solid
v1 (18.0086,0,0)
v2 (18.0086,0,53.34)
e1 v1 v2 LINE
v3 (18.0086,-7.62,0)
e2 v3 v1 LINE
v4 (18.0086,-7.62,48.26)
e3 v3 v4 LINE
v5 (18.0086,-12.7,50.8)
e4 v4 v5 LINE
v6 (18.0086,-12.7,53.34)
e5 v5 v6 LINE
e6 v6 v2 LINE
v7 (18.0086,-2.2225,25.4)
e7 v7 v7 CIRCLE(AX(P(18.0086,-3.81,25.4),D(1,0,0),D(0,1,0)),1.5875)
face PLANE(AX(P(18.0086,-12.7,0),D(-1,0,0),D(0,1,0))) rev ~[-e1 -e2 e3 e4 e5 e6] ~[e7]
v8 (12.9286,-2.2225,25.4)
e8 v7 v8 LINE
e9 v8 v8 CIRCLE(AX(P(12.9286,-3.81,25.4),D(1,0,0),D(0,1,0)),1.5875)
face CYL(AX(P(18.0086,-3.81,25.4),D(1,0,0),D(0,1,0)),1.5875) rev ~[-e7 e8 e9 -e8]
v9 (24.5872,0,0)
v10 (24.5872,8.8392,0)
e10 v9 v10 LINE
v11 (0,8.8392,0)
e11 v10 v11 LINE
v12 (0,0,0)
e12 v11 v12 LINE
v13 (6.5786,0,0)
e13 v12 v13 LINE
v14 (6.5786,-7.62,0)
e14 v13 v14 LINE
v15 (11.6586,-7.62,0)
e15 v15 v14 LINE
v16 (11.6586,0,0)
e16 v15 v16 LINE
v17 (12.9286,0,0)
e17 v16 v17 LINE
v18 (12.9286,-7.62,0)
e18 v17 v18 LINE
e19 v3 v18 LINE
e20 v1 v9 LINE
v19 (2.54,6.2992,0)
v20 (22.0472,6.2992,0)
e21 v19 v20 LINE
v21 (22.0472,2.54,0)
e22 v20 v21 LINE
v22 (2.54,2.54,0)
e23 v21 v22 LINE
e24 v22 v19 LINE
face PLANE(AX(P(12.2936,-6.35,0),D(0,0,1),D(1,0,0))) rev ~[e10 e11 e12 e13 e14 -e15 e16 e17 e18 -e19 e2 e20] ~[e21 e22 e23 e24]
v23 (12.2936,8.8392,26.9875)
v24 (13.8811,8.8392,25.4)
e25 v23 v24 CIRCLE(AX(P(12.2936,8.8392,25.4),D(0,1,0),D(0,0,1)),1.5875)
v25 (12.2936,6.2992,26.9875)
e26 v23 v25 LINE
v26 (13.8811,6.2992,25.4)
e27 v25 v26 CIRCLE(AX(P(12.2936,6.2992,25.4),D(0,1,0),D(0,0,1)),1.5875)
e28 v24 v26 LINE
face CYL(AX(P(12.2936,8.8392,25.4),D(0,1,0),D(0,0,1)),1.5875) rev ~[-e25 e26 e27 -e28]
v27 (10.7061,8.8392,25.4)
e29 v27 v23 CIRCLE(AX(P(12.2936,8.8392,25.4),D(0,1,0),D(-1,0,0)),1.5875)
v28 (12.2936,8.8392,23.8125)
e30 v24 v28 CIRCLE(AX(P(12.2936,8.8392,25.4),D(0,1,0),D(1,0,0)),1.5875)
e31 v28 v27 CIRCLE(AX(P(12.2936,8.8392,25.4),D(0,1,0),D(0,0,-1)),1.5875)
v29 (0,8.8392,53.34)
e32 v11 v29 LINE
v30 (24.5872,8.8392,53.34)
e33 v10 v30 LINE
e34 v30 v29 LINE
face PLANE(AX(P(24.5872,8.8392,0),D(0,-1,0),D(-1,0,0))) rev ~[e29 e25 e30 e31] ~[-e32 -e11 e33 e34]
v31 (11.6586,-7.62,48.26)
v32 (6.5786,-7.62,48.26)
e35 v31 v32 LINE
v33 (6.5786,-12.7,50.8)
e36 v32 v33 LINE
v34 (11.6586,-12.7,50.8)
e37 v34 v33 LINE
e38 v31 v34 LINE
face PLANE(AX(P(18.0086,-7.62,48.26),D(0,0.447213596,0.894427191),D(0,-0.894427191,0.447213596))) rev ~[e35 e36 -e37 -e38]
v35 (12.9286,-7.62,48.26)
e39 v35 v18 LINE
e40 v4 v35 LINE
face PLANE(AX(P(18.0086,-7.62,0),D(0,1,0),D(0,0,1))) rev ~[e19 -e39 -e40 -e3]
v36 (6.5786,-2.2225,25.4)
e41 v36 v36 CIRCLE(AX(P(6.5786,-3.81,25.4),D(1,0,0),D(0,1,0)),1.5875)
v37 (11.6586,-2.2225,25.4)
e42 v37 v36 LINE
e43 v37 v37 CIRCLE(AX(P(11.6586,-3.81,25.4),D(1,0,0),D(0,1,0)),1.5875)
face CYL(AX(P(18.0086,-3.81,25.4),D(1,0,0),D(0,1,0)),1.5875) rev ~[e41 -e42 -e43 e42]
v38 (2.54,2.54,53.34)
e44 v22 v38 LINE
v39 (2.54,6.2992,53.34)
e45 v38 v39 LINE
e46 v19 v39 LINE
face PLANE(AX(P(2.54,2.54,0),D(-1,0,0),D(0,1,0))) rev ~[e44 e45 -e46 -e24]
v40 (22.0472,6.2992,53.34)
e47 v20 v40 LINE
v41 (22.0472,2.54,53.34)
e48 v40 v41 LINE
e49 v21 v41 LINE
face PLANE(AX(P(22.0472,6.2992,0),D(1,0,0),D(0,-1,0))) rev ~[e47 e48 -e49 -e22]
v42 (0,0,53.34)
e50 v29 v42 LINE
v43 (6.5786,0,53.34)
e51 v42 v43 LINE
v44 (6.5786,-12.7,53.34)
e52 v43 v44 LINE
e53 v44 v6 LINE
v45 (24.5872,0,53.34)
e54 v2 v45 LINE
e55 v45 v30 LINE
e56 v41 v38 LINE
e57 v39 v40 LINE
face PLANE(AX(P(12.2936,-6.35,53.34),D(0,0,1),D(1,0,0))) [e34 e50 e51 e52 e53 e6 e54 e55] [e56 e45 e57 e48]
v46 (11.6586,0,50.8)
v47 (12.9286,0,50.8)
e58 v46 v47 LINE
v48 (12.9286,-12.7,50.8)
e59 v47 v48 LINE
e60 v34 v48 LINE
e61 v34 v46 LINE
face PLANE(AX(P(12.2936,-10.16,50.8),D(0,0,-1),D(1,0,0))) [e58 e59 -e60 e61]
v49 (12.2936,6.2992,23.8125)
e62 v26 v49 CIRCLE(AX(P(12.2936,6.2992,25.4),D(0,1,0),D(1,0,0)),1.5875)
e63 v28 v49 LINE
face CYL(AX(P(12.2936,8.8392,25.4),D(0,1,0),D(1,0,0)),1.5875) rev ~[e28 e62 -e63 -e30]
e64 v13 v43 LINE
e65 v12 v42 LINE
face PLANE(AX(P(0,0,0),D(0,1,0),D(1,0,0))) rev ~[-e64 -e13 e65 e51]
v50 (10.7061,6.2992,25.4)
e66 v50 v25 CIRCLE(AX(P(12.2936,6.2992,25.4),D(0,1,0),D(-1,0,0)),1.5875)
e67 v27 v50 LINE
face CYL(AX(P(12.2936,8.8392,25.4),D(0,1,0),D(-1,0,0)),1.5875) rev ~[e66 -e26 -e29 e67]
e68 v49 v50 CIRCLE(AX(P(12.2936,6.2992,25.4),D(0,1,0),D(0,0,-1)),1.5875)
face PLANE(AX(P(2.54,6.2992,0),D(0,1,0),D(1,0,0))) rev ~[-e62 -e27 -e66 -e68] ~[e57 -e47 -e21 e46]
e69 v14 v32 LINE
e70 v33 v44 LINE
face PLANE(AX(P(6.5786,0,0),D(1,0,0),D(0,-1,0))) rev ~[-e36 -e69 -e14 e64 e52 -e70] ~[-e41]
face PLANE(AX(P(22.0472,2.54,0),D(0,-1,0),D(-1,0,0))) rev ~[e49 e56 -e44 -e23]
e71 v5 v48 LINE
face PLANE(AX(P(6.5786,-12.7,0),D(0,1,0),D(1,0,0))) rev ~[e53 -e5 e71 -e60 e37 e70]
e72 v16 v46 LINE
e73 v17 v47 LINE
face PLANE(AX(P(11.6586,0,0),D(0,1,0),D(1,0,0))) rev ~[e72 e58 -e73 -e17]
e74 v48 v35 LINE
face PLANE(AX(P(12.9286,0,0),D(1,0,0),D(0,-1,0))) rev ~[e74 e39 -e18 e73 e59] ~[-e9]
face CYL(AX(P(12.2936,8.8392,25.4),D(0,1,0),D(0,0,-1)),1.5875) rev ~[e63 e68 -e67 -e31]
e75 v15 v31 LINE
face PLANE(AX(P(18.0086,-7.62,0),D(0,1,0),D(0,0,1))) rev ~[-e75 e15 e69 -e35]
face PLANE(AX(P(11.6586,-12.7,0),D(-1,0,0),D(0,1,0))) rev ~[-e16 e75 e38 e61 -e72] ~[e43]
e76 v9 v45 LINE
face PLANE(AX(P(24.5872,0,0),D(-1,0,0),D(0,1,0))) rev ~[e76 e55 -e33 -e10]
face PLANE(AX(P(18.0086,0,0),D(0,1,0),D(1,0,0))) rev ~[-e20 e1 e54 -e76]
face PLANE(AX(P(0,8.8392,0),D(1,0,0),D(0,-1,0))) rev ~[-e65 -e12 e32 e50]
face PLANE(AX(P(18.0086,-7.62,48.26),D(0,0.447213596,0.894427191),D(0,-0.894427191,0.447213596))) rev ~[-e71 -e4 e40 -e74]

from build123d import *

# Parameters (mm, degrees)
F1_DEPTH = 53.34
F2_R     = 1.5875
F3_DEPTH = 25.4
F4_W     = 1.27
F4_H     = 5.08
F4_H_2   = 7.62
F5_DEPTH = 50.8
F7_DEPTH = 5.08


with BuildPart() as f1:
    # F0 (on Top) → F1 (new body)
    with BuildSketch(Plane.XY):
        Polygon((12.2936, 0), (6.5786, 0), (6.5786, -12.7), (18.0086, -12.7), (18.0086, 0), align=None)
        Polygon((0, 8.8392), (0, 0), (6.5786, 0), (12.2936, 0), (12.2936, 2.54), (2.54, 2.54), (2.54, 6.2992), (5.08, 6.2992), (12.2936, 6.2992), (12.2936, 8.8392), (5.08, 8.8392), align=None)
        Polygon((12.2936, 2.54), (12.2936, 0), (18.0086, 0), (24.5872, 0), (24.5872, 8.8392), (19.5072, 8.8392), (12.2936, 8.8392), (12.2936, 6.2992), (19.5072, 6.2992), (22.0472, 6.2992), (22.0472, 2.54), align=None)
    extrude(amount=F1_DEPTH)

    # F2 (on face) → F3 (cut)
    with BuildSketch(Plane.YZ.offset(18.0086)):
        Polygon((-7.62, 48.26), (-12.7, 50.8), (-12.7, 0), (-7.62, 0), align=None)
        with Locations((-3.81, 25.4)):
            Circle(F2_R)
    extrude(amount=-F3_DEPTH, mode=Mode.SUBTRACT)

    # F4 (on face) → F5 (cut)
    with BuildSketch(Plane(origin=(0, 0, 0), x_dir=(1, 0, 0), z_dir=(0, 0, -1))):
        with Locations((12.2936, 10.16)):
            Rectangle(F4_W, F4_H)
        with Locations((12.2936, 3.81)):
            Rectangle(F4_W, F4_H_2)
    extrude(amount=-F5_DEPTH, mode=Mode.SUBTRACT)

    # F6 (on face) → F7 (cut)
    with BuildSketch(Plane(origin=(0, 8.8392, 0), x_dir=(-1, 0, 0), z_dir=(0, 1, 0))):
        with BuildLine():
            ThreePointArc((-10.7061, 25.4), (-11.1710679849, 26.5225320151), (-12.2936, 26.9875))
            Line((-12.2936, 26.9875), (-12.2936, 25.4))
            Line((-12.2936, 25.4), (-10.7061, 25.4))
        make_face()
        with BuildLine():
            Line((-12.2936, 25.4), (-12.2936, 26.9875))
            ThreePointArc((-12.2936, 26.9875), (-13.4161320151, 26.5225320151), (-13.8811, 25.4))
            Line((-13.8811, 25.4), (-12.2936, 25.4))
        make_face()
        with BuildLine():
            Line((-10.7061, 25.4), (-12.2936, 25.4))
            Line((-12.2936, 25.4), (-12.2936, 23.8125))
            ThreePointArc((-12.2936, 23.8125), (-11.1710679849, 24.2774679849), (-10.7061, 25.4))
        make_face()
        with BuildLine():
            Line((-12.2936, 23.8125), (-12.2936, 25.4))
            Line((-12.2936, 25.4), (-13.8811, 25.4))
            ThreePointArc((-13.8811, 25.4), (-13.4161320151, 24.2774679849), (-12.2936, 23.8125))
        make_face()
    extrude(amount=-F7_DEPTH, mode=Mode.SUBTRACT)


solid = f1.part
